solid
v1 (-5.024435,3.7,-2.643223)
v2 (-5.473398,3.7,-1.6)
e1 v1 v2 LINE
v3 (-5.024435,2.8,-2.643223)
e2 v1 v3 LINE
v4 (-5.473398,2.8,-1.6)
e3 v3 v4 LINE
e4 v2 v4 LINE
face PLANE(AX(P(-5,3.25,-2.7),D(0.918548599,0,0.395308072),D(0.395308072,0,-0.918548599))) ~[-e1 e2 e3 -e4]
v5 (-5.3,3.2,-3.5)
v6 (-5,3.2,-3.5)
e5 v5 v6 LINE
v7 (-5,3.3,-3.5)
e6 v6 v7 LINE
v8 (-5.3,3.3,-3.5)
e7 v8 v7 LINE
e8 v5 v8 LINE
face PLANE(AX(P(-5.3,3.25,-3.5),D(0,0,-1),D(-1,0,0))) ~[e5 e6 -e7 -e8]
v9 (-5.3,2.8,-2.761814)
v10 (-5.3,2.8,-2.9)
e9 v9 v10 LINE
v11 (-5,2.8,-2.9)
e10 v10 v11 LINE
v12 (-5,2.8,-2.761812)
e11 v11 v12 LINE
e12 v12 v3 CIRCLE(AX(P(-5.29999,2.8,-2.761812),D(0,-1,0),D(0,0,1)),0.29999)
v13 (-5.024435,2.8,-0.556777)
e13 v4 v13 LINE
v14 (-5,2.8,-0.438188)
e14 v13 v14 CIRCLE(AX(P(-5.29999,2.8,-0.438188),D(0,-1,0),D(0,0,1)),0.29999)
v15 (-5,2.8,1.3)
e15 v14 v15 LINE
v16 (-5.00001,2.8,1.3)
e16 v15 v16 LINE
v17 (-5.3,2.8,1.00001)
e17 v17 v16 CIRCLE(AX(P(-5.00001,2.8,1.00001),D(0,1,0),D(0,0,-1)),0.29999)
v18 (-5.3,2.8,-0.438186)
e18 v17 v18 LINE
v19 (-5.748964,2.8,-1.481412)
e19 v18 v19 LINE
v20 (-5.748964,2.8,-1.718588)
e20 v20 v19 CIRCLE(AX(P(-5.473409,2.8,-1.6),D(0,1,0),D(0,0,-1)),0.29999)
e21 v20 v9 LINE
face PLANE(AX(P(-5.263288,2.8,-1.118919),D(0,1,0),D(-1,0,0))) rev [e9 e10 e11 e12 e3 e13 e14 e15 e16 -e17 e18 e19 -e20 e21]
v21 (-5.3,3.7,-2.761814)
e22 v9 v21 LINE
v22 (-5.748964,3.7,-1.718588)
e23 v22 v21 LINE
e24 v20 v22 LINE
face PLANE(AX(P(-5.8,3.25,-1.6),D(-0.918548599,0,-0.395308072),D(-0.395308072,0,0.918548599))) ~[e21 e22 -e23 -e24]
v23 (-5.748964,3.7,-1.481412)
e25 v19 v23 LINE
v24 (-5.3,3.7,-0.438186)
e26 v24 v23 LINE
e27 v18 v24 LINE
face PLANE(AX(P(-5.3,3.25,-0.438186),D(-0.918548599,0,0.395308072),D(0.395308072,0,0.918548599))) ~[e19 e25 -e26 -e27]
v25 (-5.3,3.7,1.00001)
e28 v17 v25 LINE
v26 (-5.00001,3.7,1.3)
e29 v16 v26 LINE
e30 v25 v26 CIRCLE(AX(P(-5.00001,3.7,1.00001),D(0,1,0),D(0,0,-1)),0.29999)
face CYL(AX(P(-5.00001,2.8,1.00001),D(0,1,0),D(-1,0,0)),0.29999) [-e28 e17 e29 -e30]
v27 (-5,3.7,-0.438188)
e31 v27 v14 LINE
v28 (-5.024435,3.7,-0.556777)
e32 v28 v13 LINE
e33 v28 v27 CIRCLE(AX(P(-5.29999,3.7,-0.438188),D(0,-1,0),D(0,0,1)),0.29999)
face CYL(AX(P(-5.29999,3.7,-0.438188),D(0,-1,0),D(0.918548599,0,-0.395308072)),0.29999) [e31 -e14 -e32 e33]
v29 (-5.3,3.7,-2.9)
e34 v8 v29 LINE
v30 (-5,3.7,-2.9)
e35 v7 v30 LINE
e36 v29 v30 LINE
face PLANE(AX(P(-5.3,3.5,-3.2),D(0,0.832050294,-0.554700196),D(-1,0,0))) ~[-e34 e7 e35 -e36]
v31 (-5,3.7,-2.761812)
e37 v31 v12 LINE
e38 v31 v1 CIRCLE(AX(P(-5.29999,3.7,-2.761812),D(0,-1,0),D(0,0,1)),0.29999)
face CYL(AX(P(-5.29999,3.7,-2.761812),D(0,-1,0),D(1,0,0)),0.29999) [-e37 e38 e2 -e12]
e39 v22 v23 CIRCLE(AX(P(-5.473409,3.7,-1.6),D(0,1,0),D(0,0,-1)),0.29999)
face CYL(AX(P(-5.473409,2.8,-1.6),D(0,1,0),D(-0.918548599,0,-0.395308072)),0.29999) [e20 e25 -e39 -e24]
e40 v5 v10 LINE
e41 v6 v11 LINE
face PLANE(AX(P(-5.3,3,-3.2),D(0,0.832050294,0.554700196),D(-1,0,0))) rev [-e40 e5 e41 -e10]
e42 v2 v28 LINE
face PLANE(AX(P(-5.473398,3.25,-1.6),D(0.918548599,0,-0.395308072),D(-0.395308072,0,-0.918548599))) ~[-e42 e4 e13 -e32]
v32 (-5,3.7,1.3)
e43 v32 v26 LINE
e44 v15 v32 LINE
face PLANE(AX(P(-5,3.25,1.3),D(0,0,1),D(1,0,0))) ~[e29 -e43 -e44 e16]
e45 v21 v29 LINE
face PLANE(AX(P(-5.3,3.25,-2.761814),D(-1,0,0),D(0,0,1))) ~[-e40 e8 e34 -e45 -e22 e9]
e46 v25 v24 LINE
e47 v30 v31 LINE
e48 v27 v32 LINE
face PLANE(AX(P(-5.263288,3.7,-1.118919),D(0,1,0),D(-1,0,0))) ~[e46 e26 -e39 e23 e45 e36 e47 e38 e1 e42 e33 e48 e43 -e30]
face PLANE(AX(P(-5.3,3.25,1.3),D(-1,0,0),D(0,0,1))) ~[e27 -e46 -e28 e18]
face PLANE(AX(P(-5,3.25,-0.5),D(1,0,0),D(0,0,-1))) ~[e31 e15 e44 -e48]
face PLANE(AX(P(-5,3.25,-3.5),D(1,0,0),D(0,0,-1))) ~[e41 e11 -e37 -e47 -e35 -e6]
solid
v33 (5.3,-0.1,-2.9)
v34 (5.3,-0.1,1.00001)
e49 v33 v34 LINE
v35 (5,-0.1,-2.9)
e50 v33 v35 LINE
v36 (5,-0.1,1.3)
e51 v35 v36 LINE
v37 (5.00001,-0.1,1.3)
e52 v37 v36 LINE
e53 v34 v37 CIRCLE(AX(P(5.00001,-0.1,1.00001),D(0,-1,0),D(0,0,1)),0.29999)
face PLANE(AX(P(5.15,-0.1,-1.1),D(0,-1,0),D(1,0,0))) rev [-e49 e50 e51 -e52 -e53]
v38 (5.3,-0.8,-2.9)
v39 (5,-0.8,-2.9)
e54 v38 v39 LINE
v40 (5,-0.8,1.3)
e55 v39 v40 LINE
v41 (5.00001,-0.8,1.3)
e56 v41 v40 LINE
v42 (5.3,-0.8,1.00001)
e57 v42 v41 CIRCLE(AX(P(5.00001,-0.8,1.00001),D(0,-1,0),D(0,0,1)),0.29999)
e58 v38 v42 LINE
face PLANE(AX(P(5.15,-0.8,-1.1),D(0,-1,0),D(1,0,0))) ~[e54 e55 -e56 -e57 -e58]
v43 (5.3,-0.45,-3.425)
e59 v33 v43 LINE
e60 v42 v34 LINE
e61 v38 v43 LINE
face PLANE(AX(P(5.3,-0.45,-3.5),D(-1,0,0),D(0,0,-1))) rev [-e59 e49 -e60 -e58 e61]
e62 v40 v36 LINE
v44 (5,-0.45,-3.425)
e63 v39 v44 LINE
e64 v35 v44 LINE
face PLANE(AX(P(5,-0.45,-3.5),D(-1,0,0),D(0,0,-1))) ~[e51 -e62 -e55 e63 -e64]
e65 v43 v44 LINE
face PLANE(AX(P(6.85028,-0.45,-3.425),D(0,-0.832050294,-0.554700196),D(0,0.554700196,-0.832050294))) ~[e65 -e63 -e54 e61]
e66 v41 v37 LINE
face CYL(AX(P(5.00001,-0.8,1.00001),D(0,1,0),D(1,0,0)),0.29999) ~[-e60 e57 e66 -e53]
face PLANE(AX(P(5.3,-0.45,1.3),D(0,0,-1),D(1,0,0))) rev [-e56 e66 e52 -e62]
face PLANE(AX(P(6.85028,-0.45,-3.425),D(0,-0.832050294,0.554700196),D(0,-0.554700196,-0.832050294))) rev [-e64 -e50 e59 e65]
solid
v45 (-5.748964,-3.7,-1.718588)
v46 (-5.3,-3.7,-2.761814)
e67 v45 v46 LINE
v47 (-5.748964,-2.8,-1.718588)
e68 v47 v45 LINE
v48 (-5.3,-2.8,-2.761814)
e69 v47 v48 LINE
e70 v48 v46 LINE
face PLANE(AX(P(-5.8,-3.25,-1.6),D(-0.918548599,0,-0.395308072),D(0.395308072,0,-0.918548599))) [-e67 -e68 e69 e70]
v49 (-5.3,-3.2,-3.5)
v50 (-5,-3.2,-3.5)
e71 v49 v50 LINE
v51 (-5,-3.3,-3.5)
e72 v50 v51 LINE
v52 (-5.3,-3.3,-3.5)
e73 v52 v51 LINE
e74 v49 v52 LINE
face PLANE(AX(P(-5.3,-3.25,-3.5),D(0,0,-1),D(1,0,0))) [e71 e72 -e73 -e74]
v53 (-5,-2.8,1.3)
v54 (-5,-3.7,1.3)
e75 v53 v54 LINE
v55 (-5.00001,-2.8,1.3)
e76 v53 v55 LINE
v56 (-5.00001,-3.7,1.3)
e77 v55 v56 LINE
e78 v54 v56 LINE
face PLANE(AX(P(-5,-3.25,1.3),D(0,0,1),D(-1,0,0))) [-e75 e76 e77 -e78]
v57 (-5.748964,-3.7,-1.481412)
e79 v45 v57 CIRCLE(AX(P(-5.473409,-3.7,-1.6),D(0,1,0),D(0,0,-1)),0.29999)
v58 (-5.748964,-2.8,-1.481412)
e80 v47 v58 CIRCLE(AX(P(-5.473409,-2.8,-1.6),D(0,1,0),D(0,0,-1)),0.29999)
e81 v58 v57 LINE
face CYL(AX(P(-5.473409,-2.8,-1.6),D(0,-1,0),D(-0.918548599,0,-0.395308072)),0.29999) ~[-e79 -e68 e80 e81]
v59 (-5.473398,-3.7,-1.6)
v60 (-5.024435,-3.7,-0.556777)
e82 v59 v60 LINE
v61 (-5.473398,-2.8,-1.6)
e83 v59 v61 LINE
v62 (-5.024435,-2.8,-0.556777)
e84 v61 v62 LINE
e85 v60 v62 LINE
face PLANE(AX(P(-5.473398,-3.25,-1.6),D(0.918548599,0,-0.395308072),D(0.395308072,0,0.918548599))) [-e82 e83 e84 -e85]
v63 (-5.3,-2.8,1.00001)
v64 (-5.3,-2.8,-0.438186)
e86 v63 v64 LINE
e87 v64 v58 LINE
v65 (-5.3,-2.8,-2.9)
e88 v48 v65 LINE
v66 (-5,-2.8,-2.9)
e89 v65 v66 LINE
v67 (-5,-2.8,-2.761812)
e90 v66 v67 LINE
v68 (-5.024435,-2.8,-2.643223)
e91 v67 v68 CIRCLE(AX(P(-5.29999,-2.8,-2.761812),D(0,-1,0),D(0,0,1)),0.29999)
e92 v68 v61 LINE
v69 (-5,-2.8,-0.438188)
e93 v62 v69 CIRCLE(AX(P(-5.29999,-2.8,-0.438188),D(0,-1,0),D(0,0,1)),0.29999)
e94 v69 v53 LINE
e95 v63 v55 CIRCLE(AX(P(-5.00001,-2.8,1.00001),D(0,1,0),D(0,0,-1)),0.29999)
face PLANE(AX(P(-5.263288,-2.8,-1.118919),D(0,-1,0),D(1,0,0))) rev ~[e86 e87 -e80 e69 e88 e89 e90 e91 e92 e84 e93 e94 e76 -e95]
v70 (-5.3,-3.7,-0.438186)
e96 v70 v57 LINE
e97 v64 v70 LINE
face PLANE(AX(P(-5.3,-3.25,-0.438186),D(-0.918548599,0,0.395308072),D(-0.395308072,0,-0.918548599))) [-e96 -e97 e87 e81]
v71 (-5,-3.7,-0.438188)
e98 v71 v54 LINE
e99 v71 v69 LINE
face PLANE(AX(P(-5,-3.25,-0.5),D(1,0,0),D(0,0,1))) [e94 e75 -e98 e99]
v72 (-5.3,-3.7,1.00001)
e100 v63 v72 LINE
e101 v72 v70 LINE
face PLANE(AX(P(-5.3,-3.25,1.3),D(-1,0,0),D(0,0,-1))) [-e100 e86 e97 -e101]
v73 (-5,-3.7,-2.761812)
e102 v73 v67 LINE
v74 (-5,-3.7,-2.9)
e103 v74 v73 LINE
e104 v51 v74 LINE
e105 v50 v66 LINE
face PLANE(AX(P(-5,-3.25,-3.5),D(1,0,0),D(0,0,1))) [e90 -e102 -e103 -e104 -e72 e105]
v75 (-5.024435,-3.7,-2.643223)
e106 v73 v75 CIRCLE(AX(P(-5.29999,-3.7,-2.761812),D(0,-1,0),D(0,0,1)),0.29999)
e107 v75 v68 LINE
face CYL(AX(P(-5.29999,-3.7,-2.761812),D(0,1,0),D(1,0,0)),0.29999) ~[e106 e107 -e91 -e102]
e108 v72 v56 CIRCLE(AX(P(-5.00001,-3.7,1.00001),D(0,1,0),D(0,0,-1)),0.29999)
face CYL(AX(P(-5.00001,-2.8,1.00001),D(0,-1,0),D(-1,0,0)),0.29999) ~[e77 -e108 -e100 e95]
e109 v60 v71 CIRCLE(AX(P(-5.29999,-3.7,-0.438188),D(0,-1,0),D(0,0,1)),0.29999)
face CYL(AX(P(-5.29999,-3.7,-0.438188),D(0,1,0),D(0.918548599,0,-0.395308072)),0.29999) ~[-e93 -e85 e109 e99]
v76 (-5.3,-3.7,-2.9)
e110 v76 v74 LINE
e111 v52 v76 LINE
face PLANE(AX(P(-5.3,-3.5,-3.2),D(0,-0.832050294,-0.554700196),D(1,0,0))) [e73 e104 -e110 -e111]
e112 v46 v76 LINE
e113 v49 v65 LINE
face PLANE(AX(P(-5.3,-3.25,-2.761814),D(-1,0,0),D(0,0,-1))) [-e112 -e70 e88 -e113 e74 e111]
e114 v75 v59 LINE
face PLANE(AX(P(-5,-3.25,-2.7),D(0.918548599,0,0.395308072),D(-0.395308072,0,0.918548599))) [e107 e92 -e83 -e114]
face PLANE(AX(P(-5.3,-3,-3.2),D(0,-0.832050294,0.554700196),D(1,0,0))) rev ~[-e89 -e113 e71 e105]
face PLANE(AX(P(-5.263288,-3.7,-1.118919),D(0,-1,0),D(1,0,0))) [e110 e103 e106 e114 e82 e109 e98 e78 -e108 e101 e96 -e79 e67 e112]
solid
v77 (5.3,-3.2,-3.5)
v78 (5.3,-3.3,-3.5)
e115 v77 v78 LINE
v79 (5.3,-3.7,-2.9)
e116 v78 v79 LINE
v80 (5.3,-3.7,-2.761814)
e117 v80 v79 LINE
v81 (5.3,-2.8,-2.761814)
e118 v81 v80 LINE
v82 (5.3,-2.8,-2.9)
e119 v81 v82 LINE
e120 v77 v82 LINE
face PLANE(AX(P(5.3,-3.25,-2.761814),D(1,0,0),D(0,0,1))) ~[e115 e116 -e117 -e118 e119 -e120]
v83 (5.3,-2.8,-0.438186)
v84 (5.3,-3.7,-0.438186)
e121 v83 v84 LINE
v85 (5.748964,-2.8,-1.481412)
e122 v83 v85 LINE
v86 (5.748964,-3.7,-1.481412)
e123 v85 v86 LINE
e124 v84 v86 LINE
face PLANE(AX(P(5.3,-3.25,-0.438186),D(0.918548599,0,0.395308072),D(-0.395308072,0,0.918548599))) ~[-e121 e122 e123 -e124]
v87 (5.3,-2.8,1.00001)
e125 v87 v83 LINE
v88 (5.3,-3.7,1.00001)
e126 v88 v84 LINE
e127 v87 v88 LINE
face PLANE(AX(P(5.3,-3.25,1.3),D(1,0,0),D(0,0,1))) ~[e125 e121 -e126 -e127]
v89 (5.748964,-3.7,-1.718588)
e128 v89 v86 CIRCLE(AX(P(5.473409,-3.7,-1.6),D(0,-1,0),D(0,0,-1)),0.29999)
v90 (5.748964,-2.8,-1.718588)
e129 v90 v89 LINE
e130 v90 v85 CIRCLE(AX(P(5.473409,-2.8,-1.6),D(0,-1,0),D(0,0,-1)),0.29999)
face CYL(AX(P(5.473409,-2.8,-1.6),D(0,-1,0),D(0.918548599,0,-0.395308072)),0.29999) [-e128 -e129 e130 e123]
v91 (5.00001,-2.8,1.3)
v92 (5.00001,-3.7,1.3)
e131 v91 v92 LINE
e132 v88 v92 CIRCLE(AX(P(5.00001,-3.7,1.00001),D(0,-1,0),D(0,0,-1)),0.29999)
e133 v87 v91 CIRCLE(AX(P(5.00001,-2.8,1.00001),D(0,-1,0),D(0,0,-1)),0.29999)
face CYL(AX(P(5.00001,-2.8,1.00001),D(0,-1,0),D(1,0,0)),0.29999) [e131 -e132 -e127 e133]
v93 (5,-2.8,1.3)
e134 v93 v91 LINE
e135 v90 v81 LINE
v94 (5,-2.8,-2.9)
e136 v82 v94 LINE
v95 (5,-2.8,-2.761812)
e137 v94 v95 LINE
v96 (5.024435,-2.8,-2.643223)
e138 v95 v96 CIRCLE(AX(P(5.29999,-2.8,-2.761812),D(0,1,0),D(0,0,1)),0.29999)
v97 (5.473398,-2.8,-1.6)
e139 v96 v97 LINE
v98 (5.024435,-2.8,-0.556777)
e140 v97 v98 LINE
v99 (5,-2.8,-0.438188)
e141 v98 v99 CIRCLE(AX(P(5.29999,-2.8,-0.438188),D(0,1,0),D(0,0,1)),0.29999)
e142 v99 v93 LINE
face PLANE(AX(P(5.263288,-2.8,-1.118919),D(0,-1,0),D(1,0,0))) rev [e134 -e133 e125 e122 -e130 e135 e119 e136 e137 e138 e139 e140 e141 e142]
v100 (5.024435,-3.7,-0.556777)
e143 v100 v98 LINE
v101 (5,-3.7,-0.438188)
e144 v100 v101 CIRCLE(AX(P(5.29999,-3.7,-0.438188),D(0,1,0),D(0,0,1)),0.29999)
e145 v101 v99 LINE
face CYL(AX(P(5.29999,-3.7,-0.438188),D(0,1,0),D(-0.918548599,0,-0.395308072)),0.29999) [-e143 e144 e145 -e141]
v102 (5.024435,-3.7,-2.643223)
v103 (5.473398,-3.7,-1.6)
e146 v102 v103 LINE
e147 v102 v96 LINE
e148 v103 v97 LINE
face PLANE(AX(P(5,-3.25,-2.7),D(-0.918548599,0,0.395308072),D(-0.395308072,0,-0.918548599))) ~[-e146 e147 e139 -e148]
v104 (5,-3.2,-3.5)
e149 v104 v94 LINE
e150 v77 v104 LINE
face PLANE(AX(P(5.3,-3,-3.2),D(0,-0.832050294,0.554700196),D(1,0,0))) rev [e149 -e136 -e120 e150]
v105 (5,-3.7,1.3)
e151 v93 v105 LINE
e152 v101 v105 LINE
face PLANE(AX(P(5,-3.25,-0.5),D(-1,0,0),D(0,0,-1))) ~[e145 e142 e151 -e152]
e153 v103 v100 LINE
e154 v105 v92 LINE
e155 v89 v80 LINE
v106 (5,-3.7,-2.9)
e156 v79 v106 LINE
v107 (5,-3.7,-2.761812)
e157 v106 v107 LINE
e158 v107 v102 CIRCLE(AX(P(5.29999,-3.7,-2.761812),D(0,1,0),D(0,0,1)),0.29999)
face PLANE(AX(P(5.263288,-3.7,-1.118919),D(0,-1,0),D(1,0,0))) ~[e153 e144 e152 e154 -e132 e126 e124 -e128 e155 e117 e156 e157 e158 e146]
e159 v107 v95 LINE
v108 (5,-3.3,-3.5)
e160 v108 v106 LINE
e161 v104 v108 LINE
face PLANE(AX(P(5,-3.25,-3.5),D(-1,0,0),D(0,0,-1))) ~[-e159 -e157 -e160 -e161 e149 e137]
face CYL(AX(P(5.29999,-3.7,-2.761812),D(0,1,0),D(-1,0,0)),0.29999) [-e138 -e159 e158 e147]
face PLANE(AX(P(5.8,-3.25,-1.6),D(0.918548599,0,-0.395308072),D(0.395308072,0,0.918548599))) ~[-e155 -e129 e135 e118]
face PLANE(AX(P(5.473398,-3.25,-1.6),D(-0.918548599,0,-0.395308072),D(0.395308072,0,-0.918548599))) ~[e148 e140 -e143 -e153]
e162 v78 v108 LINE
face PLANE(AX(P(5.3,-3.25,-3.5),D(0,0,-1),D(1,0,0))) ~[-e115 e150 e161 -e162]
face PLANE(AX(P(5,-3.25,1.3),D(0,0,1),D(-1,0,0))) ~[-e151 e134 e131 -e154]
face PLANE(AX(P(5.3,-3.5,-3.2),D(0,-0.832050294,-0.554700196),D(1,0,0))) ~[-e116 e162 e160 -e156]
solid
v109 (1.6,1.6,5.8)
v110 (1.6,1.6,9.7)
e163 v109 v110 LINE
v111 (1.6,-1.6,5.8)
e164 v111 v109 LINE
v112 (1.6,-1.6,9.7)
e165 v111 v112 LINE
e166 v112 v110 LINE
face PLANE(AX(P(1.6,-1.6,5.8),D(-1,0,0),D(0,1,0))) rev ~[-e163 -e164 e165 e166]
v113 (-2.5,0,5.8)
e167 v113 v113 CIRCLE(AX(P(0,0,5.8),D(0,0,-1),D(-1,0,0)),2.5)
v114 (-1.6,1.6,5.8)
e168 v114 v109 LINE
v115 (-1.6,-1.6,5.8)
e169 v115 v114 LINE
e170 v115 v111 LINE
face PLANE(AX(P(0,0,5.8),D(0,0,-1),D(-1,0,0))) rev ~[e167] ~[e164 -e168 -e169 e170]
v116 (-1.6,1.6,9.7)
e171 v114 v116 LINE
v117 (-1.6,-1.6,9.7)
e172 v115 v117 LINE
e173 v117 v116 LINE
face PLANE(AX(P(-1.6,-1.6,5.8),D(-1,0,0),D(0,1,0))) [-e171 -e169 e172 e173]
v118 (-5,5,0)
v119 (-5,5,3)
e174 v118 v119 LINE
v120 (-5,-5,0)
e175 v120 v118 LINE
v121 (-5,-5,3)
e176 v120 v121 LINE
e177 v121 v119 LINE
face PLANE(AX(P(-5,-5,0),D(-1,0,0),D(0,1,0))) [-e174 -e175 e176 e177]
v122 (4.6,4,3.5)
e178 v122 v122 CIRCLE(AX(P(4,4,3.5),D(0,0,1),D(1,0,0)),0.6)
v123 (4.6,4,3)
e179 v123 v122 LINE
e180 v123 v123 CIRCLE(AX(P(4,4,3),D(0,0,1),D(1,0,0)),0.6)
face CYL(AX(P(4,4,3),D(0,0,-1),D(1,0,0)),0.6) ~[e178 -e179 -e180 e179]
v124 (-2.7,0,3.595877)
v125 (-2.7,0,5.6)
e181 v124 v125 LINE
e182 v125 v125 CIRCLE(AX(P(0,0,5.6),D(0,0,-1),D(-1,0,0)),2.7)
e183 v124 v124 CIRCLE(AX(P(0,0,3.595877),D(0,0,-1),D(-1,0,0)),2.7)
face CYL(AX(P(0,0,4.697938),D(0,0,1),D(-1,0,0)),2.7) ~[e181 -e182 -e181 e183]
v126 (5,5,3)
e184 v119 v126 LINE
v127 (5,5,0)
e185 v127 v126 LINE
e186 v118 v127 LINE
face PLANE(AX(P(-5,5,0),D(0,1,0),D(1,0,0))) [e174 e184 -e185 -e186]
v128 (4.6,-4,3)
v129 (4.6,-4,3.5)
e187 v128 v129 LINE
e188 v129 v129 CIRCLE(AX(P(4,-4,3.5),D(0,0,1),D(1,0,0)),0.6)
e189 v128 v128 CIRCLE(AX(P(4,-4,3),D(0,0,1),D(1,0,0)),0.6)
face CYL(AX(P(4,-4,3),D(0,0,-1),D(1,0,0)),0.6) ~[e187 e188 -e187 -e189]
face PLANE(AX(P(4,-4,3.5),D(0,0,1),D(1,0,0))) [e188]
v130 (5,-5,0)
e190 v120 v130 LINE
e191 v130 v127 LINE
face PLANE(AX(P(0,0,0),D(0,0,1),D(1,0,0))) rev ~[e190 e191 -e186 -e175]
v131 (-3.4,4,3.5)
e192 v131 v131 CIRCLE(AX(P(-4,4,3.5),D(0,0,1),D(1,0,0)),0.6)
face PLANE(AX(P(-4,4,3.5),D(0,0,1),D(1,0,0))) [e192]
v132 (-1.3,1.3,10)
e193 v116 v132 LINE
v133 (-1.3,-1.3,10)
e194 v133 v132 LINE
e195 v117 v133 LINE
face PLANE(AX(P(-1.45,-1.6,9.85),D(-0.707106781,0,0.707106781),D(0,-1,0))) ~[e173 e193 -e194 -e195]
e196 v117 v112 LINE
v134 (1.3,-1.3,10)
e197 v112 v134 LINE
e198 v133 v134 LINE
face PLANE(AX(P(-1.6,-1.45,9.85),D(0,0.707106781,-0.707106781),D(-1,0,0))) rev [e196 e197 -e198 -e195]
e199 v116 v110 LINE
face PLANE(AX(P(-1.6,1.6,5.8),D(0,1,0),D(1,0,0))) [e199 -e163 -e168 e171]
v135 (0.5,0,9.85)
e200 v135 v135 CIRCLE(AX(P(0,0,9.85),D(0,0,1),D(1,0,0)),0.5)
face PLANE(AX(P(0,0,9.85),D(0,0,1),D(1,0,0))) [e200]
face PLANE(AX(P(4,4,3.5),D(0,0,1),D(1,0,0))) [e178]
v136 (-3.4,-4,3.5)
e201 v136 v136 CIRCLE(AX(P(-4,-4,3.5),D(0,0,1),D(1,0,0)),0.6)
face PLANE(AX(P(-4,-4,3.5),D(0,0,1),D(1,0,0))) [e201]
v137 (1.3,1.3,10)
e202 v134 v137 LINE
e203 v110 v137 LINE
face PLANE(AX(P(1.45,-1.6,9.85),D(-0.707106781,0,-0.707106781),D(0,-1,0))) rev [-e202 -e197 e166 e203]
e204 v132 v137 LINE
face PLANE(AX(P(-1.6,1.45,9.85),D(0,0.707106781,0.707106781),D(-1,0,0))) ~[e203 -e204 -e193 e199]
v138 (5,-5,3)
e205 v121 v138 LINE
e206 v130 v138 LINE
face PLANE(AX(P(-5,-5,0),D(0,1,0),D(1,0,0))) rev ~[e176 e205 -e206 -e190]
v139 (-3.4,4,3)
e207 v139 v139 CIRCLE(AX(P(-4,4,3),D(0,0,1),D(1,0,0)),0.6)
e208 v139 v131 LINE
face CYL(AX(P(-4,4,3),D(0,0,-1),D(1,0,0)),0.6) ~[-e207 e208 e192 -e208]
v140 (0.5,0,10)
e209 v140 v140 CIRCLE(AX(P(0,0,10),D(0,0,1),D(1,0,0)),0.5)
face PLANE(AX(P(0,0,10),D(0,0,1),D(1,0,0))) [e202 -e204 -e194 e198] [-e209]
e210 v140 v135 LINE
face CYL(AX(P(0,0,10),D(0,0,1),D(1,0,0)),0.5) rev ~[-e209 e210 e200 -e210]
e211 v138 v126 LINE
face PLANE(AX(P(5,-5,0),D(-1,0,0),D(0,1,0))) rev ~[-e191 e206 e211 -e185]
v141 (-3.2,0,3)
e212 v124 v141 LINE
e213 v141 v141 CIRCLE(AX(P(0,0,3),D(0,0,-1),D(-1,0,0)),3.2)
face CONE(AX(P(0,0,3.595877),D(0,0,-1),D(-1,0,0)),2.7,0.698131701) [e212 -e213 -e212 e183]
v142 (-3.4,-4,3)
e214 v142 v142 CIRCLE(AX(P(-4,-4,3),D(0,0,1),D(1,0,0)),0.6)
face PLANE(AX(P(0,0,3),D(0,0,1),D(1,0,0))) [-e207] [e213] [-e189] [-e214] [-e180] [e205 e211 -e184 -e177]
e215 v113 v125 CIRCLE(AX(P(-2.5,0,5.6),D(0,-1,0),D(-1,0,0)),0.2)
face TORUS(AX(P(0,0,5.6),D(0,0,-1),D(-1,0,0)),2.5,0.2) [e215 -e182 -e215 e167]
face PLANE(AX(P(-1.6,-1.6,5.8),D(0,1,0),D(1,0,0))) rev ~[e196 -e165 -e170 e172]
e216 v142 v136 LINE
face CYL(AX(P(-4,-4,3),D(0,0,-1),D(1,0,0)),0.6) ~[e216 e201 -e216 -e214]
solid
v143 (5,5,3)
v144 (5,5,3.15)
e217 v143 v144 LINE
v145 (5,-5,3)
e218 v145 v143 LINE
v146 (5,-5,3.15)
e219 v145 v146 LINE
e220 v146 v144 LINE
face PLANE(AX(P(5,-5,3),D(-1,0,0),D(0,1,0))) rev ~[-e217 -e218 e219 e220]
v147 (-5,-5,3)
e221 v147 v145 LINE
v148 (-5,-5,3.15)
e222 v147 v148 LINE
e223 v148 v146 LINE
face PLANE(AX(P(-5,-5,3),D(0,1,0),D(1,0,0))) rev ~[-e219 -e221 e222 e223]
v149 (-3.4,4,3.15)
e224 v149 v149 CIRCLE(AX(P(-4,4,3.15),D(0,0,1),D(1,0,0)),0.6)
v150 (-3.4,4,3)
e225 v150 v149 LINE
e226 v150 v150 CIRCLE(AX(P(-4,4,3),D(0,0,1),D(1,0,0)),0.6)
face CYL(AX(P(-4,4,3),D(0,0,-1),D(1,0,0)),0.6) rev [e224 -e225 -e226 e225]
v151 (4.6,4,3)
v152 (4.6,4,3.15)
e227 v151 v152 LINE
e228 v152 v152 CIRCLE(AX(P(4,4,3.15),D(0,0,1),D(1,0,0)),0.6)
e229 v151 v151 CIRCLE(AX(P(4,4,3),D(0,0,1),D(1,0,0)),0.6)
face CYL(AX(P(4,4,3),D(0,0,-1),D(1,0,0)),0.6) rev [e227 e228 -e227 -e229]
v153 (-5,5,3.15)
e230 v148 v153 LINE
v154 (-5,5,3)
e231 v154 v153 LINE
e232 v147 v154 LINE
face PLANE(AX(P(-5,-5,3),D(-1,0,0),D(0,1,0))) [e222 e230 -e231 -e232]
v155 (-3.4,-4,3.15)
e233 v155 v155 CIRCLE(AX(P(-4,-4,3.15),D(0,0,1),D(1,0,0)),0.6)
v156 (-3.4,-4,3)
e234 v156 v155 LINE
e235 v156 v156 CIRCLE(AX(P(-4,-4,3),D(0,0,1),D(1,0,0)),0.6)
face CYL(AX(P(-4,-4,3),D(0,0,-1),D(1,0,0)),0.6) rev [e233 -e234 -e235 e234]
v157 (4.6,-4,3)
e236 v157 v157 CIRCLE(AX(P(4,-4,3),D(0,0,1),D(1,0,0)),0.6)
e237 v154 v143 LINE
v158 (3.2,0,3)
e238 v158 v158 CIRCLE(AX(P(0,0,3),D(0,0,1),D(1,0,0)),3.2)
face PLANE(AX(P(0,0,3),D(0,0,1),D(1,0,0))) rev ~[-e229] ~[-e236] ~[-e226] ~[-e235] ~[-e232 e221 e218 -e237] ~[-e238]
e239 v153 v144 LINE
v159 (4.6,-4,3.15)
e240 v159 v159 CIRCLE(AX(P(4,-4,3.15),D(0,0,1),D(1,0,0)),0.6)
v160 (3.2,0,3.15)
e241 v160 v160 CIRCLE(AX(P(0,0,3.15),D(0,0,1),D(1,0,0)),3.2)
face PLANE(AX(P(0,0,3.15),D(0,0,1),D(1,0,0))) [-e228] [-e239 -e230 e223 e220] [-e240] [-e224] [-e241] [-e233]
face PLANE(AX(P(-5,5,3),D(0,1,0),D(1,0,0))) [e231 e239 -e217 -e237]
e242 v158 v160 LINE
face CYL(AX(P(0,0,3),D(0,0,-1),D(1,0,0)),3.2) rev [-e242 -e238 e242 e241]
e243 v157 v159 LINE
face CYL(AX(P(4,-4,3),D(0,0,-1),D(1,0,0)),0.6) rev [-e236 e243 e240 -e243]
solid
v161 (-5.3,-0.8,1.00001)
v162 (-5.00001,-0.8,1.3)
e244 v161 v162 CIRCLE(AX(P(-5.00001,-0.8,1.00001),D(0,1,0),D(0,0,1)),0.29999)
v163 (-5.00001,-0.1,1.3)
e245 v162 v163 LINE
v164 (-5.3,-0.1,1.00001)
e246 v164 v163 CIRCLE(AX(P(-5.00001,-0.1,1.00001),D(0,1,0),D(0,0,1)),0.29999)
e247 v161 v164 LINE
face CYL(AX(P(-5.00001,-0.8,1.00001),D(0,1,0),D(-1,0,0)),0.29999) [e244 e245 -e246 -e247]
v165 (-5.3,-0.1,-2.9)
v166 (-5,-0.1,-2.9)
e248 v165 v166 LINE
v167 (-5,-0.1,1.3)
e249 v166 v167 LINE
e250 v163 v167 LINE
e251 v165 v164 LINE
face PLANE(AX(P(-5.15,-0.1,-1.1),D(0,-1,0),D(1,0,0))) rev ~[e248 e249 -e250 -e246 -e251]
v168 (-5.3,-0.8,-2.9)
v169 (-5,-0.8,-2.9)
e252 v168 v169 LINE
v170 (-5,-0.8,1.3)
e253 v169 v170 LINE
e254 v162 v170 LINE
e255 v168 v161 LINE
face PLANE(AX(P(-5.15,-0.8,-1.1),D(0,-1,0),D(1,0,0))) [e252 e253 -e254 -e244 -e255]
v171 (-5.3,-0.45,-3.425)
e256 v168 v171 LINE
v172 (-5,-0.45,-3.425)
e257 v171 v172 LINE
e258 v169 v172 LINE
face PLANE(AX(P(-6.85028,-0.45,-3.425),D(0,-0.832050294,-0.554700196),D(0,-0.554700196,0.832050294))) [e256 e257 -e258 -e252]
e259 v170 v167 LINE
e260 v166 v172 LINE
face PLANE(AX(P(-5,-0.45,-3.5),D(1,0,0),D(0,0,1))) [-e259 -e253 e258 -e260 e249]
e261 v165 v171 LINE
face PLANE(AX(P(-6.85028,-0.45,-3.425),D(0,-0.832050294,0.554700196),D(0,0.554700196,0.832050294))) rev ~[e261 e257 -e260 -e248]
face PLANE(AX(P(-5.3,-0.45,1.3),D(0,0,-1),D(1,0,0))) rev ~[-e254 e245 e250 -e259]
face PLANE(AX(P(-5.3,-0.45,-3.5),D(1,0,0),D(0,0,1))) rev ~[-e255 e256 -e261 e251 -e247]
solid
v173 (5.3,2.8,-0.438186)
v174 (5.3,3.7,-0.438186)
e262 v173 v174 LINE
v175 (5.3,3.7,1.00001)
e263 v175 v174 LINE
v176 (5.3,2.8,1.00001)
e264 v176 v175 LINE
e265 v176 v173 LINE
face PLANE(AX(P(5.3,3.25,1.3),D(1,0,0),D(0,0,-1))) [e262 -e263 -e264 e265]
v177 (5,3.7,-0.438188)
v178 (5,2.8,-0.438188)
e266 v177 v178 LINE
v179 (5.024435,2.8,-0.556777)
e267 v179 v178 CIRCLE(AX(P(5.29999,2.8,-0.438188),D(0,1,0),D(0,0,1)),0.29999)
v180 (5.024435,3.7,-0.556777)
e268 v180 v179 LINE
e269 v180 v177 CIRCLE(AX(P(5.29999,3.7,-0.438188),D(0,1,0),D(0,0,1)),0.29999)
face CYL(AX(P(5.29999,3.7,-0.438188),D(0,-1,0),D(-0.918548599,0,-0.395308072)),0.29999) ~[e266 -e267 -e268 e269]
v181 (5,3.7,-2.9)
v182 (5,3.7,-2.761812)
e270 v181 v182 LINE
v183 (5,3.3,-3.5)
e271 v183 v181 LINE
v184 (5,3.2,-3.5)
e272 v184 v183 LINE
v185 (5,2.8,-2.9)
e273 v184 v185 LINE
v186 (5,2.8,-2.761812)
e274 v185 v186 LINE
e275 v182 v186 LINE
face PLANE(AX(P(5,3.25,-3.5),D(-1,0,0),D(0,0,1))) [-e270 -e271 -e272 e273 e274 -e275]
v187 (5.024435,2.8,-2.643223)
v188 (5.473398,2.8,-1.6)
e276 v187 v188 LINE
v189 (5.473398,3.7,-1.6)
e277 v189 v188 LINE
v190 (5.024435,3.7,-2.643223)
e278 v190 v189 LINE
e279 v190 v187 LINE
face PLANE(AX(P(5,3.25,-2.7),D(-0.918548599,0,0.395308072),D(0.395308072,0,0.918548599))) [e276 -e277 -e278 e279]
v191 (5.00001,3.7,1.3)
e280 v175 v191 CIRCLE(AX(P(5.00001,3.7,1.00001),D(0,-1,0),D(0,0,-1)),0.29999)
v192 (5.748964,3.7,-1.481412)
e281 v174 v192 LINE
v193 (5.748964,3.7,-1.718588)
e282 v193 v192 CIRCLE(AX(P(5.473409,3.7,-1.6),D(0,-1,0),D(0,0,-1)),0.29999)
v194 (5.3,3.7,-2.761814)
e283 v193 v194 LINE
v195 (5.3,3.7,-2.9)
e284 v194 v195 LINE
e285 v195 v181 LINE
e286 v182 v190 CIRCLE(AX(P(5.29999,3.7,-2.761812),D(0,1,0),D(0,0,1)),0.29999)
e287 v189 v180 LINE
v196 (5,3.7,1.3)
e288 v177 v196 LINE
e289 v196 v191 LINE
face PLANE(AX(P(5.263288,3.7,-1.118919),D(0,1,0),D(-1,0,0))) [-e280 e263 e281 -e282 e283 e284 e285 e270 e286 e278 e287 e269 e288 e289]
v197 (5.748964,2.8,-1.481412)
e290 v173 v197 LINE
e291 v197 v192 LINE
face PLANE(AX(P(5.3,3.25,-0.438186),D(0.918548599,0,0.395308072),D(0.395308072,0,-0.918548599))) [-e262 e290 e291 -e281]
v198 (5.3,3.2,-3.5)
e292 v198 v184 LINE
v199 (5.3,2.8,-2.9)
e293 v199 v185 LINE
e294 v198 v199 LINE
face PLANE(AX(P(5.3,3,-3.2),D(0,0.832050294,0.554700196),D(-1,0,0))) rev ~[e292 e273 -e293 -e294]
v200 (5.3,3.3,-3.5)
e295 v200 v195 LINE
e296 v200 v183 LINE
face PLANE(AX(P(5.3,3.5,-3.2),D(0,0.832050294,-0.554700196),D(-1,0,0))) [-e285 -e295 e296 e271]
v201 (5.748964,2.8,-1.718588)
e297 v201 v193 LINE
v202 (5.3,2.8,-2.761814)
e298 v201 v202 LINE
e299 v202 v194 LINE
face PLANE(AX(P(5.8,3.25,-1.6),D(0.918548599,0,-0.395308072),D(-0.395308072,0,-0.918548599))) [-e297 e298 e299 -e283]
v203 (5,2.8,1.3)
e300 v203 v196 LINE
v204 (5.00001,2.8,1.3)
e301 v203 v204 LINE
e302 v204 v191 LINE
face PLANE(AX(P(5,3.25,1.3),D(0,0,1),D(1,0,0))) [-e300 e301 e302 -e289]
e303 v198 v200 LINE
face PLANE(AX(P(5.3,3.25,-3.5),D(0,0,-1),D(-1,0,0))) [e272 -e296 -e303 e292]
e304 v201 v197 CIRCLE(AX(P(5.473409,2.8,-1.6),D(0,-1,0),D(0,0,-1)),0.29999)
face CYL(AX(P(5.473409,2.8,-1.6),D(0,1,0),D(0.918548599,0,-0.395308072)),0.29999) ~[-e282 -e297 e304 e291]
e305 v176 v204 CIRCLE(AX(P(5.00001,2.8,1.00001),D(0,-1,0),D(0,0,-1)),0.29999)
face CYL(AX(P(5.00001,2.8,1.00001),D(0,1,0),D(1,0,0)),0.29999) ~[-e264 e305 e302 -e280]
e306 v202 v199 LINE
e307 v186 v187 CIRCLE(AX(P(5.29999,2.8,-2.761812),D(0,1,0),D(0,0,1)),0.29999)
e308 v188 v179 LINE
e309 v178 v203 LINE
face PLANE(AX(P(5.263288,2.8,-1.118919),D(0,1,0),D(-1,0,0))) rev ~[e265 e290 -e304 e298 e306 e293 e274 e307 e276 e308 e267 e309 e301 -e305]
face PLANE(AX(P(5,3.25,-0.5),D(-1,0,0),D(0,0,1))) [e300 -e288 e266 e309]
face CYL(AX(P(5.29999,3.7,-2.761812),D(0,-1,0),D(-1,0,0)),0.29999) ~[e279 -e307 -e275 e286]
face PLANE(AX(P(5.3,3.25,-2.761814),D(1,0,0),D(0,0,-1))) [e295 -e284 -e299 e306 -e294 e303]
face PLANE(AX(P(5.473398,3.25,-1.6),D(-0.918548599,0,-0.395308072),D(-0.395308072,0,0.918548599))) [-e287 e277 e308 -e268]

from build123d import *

# Parameters (mm, degrees)
F0_W           = 10
F0_H           = 10
F1_DEPTH       = 3
F2_W           = 10
F2_H           = 10
F2_R           = 0.6
F2_R_2         = 3.2
F3_DEPTH       = 0.15
F4_DEPTH       = 0.5
F5_W           = 2.7
F5_H           = 2.2041232037
F7_W           = 3.2
F7_H           = 3.2
F8_DEPTH       = 4.2
F9_R           = 0.5
F10_DEPTH      = 0.15
F11_SIZE       = 0.3
F12_R          = 0.2
F15_DEPTH      = 0.45
F17_W          = 0.3
F17_H          = 4.8
F18_DEPTH      = 0.35
F19_C1_SIZE2   = 0.6
F19_C1_SIZE    = 0.4
F19_C2_SIZE2   = 0.6
F19_C2_SIZE    = 0.4
F19_2_T1_DEPTH = 3.4005606286
F20_R          = 0.29999
F20_2_R        = 0.29999


# Not quite as in the source:
# - a fillet or chamfer that OpenCascade refuses, or shapes differently, is made with other operations: its cross-section is extruded or revolved along the edge and cut away or added
# - a fillet or chamfer is up to 0.001 mm smaller than in the source, because OpenCascade refuses the exact size


with BuildPart() as f1:
    # F0 (on Top) → F1 (new body)
    with BuildSketch(Plane.XY):
        Rectangle(F0_W, F0_H)
    extrude(amount=F1_DEPTH)

    # F2 (on face) → F4 (join)
    with BuildSketch(Plane.XY.offset(3)):
        with Locations((-4, 4)):
            Circle(F2_R)
        with Locations((4, -4)):
            Circle(F2_R)
        with Locations((4, 4)):
            Circle(F2_R)
        with Locations((-4, -4)):
            Circle(F2_R)
    extrude(amount=F4_DEPTH)

    # F5 (on Front) → F6 (revolve)
    with BuildSketch(Plane.XZ):
        Polygon((-3.2, 3), (0, 3), (0, 3.5958767963), (-2.7, 3.5958767963), align=None)
        with Locations((-1.35, 4.6979383981)):
            Rectangle(F5_W, F5_H)
    revolve(axis=Axis((0, 0, 4.6979383981), (0, 0, -1)))

    # F7 (on face) → F8 (join)
    with BuildSketch(Plane.XY.offset(5.8)):
        Rectangle(F7_W, F7_H)
    extrude(amount=F8_DEPTH)

    # F9 (on face) → F10 (cut)
    with BuildSketch(Plane.XY.offset(10)):
        Circle(F9_R)
    extrude(amount=-F10_DEPTH, mode=Mode.SUBTRACT)

    # F11
    f11_edges = [f1.edges().sort_by_distance(p)[0] for p in [
        (-1.6, 0, 10),
        (0, -1.6, 10),
        (1.6, 0, 10),
        (0, 1.6, 10),
    ]]
    chamfer(f11_edges, length=F11_SIZE)

    # F12
    f12_edges = [f1.edges().sort_by_distance(p)[0] for p in [
        (2.7, 0, 5.8),
    ]]
    fillet(f12_edges, radius=F12_R)


with BuildPart() as f3:
    # F2 (on face) → F3 (new body)
    with BuildSketch(Plane.XY.offset(3)):
        Rectangle(F2_W, F2_H)
        with Locations((-4, -4)):
            Circle(F2_R, mode=Mode.SUBTRACT)
        with Locations((4, -4)):
            Circle(F2_R, mode=Mode.SUBTRACT)
        with Locations((-4, 4)):
            Circle(F2_R, mode=Mode.SUBTRACT)
        Circle(F2_R_2, mode=Mode.SUBTRACT)
        with Locations((4, 4)):
            Circle(F2_R, mode=Mode.SUBTRACT)
    extrude(amount=F3_DEPTH)


with BuildPart() as f15:
    # F14 (on offset) → F15 (new body, symmetric)
    with BuildSketch(Plane.XZ.offset(3.25)):
        Polygon((-5, -0.5), (-5, 1.3), (-5.3, 1.3), (-5.3, -0.4381863865), (-5.8, -1.6), (-5.3, -2.7618136135), (-5.3, -3.5), (-5, -3.5), (-5, -2.7), (-5.4733977926, -1.6), align=None)
    extrude(amount=F15_DEPTH, both=True)

    # F19: chamfer of 0.4 x 0.6 on 2 edges, made by hand

    # F19_c1
    f19_c1_edges = [f15.edges().sort_by_distance(p)[0] for p in [
        (-5.15, -2.8, -3.5),
    ]]
    f19_c1_side = f15.faces().sort_by_distance((-5.15, -2.808, -3.5))[0]
    chamfer(f19_c1_edges, length=F19_C1_SIZE, length2=F19_C1_SIZE2, reference=f19_c1_side)

    # F19_c2
    f19_c2_edges = [f15.edges().sort_by_distance(p)[0] for p in [
        (-5.15, -3.7, -3.5),
    ]]
    f19_c2_side = f15.faces().sort_by_distance((-5.15, -3.692, -3.5))[0]
    chamfer(f19_c2_edges, length=F19_C2_SIZE, length2=F19_C2_SIZE2, reference=f19_c2_side)

    # F20 (radius 0.3 in the source; OpenCascade refuses exactly that, so slightly less here)
    f20_edges = [f15.edges().sort_by_distance(p)[0] for p in [
        (-5.8, -3.25, -1.6),
        (-5.3, -3.25, 1.3),
        (-5, -3.25, -2.7),
        (-5, -3.25, -0.5),
    ]]
    fillet(f20_edges, radius=F20_R)


with BuildPart() as f18:
    # F17 (on offset) → F18 (new body, symmetric)
    with BuildSketch(Plane.XZ.offset(0.45)):
        with Locations((-5.15, -1.1)):
            Rectangle(F17_W, F17_H)
    extrude(amount=F18_DEPTH, both=True)

    # F19#2: chamfer of 0.4 x 0.6 on 2 edges, made by hand

    # F19_2_s2 → F19_2_t1 (cut)
    with BuildSketch(Plane.YZ.offset(-6.8502803143)):
        Polygon((-0.4, -3.5), (-0.8, -2.9), (-0.8, -3.5), align=None)
        Polygon((-0.5, -3.5), (-0.1, -2.9), (-0.1, -3.5), align=None)
    extrude(amount=F19_2_T1_DEPTH, mode=Mode.SUBTRACT)

    # F20#2 (radius 0.3 in the source; OpenCascade refuses exactly that, so slightly less here)
    f20_2_edges = [f18.edges().sort_by_distance(p)[0] for p in [
        (-5.3, -0.45, 1.3),
    ]]
    fillet(f20_2_edges, radius=F20_2_R)


with BuildPart() as f21_1:
    # F21: instance of F15
    add(f15.part.mirror(Plane.XZ))


with BuildPart() as f22_1:
    # F22: instance of F21_1
    add(f21_1.part.mirror(Plane.YZ))


with BuildPart() as f22_2:
    # F22: instance of F15
    add(f15.part.mirror(Plane.YZ))


with BuildPart() as f22_3:
    # F22: instance of F18
    add(f18.part.mirror(Plane.YZ))


solid = Compound([f1.part, f3.part, f15.part, f18.part, f21_1.part, f22_1.part, f22_2.part, f22_3.part])
